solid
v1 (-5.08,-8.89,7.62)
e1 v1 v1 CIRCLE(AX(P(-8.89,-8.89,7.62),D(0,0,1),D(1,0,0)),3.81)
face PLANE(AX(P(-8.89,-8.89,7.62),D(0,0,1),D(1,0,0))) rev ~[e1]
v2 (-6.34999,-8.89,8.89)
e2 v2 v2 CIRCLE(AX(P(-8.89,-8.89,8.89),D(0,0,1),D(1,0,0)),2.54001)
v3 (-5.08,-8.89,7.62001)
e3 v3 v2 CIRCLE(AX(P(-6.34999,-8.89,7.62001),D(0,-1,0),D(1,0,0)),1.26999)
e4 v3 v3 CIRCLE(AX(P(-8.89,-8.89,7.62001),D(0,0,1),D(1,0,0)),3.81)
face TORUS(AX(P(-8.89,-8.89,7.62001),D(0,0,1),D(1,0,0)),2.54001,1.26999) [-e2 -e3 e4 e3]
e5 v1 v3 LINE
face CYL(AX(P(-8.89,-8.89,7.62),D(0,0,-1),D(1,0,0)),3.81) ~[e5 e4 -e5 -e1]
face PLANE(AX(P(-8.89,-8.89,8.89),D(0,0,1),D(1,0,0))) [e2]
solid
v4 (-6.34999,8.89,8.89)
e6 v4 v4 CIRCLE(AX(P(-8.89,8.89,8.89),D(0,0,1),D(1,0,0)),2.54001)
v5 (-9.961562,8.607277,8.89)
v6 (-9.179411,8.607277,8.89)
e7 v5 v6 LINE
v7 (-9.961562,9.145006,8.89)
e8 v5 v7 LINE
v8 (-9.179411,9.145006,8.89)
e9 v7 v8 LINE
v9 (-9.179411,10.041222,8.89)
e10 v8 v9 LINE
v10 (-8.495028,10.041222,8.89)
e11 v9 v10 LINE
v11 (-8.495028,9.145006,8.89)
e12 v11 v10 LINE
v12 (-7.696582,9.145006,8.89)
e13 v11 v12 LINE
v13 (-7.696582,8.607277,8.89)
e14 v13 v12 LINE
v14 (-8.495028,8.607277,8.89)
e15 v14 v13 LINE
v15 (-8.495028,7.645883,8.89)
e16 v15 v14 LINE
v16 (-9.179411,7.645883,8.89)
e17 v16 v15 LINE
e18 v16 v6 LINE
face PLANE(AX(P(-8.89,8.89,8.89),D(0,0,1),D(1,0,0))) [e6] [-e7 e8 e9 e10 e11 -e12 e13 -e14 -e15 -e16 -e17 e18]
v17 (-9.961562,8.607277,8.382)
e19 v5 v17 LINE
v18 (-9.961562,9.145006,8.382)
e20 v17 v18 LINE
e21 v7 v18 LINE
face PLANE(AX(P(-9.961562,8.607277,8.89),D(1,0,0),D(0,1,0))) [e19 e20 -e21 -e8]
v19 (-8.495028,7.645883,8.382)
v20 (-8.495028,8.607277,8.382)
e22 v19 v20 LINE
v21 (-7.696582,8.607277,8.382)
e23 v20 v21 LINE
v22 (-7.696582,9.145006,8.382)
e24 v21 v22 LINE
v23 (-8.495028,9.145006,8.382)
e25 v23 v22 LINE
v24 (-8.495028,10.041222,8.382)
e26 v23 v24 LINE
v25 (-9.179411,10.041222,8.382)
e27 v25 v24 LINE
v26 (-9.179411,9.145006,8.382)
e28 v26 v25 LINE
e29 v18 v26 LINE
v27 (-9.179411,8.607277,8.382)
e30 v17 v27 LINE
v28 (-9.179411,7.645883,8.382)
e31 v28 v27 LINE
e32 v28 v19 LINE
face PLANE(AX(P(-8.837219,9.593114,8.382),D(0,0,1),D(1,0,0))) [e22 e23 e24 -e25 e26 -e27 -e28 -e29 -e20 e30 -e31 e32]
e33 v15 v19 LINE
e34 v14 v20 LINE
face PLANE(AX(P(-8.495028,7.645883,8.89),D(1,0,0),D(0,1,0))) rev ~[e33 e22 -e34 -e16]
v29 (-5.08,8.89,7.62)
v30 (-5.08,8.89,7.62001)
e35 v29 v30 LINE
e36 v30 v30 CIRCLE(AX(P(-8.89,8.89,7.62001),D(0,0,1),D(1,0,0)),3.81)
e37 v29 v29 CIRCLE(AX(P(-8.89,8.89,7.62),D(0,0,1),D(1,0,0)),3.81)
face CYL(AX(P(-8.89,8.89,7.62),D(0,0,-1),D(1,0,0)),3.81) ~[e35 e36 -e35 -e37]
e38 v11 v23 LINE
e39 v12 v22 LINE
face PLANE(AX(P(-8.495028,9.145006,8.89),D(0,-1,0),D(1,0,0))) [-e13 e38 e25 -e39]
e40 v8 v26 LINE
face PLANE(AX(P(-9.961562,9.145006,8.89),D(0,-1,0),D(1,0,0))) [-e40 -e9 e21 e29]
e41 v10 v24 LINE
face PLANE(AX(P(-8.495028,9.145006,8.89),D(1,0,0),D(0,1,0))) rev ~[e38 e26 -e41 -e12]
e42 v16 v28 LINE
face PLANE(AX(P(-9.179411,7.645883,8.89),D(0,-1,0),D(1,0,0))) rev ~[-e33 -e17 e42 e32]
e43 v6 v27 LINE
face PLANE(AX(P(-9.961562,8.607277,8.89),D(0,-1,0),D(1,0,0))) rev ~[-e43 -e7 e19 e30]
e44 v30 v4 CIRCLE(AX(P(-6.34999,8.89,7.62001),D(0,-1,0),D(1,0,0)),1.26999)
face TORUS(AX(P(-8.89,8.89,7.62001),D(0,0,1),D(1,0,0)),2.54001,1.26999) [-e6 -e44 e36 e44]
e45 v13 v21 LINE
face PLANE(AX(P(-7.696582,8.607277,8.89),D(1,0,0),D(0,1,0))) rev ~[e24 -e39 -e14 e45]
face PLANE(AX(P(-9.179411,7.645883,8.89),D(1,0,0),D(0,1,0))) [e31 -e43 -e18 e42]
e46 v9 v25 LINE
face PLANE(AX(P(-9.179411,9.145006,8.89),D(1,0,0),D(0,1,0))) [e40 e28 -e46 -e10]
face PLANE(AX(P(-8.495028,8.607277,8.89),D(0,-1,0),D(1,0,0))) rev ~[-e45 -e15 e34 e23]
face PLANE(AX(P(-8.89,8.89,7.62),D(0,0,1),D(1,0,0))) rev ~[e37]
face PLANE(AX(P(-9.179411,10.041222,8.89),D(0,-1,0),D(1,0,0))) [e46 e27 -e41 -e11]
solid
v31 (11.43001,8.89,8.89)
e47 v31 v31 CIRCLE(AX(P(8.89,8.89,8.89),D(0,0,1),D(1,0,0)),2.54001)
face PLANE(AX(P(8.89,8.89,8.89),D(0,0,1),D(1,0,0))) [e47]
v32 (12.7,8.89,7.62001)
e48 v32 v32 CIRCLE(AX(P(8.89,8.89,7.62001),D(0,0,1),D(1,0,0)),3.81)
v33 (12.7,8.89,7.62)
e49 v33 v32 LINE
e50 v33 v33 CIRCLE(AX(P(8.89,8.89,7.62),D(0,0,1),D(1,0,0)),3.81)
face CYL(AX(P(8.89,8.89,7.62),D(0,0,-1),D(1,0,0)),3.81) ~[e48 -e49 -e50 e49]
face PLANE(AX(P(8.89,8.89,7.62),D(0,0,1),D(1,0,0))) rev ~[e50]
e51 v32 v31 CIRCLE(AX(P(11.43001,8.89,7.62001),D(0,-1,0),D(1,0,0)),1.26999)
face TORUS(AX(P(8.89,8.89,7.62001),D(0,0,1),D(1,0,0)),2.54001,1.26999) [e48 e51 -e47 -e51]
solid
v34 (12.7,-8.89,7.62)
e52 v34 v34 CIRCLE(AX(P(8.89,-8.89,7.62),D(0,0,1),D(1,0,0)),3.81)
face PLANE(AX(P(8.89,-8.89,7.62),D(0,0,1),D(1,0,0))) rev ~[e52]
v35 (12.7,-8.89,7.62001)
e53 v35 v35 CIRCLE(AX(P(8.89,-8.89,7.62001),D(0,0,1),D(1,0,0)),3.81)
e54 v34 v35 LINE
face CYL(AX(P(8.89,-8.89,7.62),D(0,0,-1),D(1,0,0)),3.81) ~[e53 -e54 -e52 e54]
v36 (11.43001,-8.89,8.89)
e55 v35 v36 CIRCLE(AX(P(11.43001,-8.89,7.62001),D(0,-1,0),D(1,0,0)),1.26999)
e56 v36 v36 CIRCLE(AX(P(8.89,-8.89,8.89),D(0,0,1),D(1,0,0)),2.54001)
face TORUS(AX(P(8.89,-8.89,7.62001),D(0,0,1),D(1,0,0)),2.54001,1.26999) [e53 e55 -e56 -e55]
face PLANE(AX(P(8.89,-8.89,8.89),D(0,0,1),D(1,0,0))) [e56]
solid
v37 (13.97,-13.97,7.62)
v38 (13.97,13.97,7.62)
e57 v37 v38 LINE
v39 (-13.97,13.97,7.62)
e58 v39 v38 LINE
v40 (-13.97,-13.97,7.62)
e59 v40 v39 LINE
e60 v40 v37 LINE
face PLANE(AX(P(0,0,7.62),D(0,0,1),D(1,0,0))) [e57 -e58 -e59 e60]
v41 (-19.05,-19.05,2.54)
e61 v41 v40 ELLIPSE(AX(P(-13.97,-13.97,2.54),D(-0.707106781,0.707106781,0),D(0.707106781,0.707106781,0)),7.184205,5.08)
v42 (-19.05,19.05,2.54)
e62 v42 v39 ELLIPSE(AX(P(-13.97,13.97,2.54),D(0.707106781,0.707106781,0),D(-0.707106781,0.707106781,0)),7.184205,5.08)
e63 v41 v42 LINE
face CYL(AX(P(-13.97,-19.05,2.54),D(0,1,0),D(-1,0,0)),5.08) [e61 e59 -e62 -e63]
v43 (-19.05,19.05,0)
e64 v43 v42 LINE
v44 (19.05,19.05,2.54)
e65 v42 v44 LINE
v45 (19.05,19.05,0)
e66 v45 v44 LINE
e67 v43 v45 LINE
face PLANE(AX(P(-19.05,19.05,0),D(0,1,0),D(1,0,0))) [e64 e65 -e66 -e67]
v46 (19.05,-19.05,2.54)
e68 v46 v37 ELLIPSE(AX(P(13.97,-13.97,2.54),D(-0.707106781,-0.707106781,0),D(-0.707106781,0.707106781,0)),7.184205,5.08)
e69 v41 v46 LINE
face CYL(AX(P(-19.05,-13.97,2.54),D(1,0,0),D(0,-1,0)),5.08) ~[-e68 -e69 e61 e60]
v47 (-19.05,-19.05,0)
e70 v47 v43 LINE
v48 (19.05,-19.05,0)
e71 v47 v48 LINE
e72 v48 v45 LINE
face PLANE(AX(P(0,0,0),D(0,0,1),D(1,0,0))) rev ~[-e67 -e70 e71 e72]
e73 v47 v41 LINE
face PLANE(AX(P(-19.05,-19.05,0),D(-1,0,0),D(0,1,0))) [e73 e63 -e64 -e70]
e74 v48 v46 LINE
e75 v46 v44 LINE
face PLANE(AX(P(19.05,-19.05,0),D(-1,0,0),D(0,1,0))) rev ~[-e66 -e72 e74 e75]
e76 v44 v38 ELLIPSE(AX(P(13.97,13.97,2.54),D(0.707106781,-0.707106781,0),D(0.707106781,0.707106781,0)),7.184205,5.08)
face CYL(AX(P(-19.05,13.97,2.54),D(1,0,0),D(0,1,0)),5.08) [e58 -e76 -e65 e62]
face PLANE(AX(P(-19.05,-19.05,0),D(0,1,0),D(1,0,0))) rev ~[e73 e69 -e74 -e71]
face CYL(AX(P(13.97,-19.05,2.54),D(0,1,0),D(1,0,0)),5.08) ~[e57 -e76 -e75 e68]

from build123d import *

# Parameters (mm, degrees)
F0_W     = 38.1
F0_H     = 38.1
F1_DEPTH = 7.62
F2_R     = 5.08
F3_R     = 3.81
F4_DEPTH = 1.27
F5_R     = 1.26999
F5_2_R   = 1.26999
F5_3_R   = 1.26999
F5_4_R   = 1.26999
F6_W     = 0.684382394
F6_H     = 0.8962163702
F6_W_2   = 0.7821517065
F6_H_2   = 0.5377288908
F6_W_3   = 0.7984461263
F6_H_3   = 0.9613940492
F7_DEPTH = 0.508


# Not quite as in the source:
# - a fillet or chamfer is up to 0.001 mm smaller than in the source, because OpenCascade refuses the exact size
# - a feature of the source that left no trace in its solid (it failed there, or was rolled back) is left out


with BuildPart() as f1:
    # F0 (on Top) → F1 (new body)
    with BuildSketch(Plane.XY):
        Rectangle(F0_W, F0_H)
    extrude(amount=F1_DEPTH)

    # F2
    f2_edges = [f1.edges().sort_by_distance(p)[0] for p in [
        (-19.05, 0, 7.62),
        (0, 19.05, 7.62),
        (19.05, 0, 7.62),
        (0, -19.05, 7.62),
    ]]
    fillet(f2_edges, radius=F2_R)


with BuildPart() as f4:
    # F3 (on face) → F4 (new body)
    with BuildSketch(Plane.XY.offset(7.62)):
        with Locations((8.89, 8.89)):
            Circle(F3_R)
    extrude(amount=F4_DEPTH)

    # F5 (radius 1.27 in the source; OpenCascade refuses exactly that, so slightly less here)
    f5_edges = [f4.edges().sort_by_distance(p)[0] for p in [
        (5.08, 8.89, 8.89),
    ]]
    fillet(f5_edges, radius=F5_R)


with BuildPart() as f4b:
    # F3 (on face) → F4, piece 2 (new body)
    with BuildSketch(Plane.XY.offset(7.62)):
        with Locations((8.89, -8.89)):
            Circle(F3_R)
    extrude(amount=F4_DEPTH)

    # F5#2 (radius 1.27 in the source; OpenCascade refuses exactly that, so slightly less here)
    f5_2_edges = [f4b.edges().sort_by_distance(p)[0] for p in [
        (5.08, -8.89, 8.89),
    ]]
    fillet(f5_2_edges, radius=F5_2_R)


with BuildPart() as f4c:
    # F3 (on face) → F4, piece 3 (new body)
    with BuildSketch(Plane.XY.offset(7.62)):
        with Locations((-8.89, -8.89)):
            Circle(F3_R)
    extrude(amount=F4_DEPTH)

    # F5#3 (radius 1.27 in the source; OpenCascade refuses exactly that, so slightly less here)
    f5_3_edges = [f4c.edges().sort_by_distance(p)[0] for p in [
        (-12.7, -8.89, 8.89),
    ]]
    fillet(f5_3_edges, radius=F5_3_R)


with BuildPart() as f4d:
    # F3 (on face) → F4, piece 4 (new body)
    with BuildSketch(Plane.XY.offset(7.62)):
        with Locations((-8.89, 8.89)):
            Circle(F3_R)
    extrude(amount=F4_DEPTH)

    # F5#4 (radius 1.27 in the source; OpenCascade refuses exactly that, so slightly less here)
    f5_4_edges = [f4d.edges().sort_by_distance(p)[0] for p in [
        (-12.7, 8.89, 8.89),
    ]]
    fillet(f5_4_edges, radius=F5_4_R)

    # F6 (on face) → F7 (cut)
    with BuildSketch(Plane.XY.offset(8.89)):
        with Locations((-8.8372193277, 9.5931137912)):
            Rectangle(F6_W, F6_H)
        with Locations((-9.5704863779, 8.8761411607)):
            Rectangle(F6_W_2, F6_H_2)
        with Locations((-8.8372193277, 8.8761411607)):
            Rectangle(F6_W, F6_H_2)
        with Locations((-8.0958050676, 8.8761411607)):
            Rectangle(F6_W_3, F6_H_2)
        with Locations((-8.8372193277, 8.1265796907)):
            Rectangle(F6_W, F6_H_3)
        with Locations((8.8355047628, 8.2747801207)):
            Rectangle(F6_W, F6_H_3)
        with Locations((8.1022377126, 9.0243415907)):
            Rectangle(F6_W_2, F6_H_2)
        with Locations((8.8355047628, 9.0243415907)):
            Rectangle(F6_W, F6_H_2)
        with Locations((8.8355047628, 9.7413142212)):
            Rectangle(F6_W, F6_H)
        with Locations((9.5769190229, 9.0243415907)):
            Rectangle(F6_W_3, F6_H_2)
        with Locations((-9.6729216166, -8.7657244876)):
            Rectangle(F6_W_2, F6_H_2)
        with Locations((-8.9396545663, -8.7657244876)):
            Rectangle(F6_W, F6_H_2)
        with Locations((-8.9396545663, -8.0487518571)):
            Rectangle(F6_W, F6_H)
        with Locations((-8.1982403062, -8.7657244876)):
            Rectangle(F6_W_3, F6_H_2)
        with Locations((8.8686496019, -9.6509321593)):
            Rectangle(F6_W, F6_H_3)
        with Locations((8.1353825517, -8.9013706893)):
            Rectangle(F6_W_2, F6_H_2)
        with Locations((9.6100638621, -8.9013706893)):
            Rectangle(F6_W_3, F6_H_2)
        with Locations((8.8686496019, -8.1843980588)):
            Rectangle(F6_W, F6_H)
        with Locations((8.8686496019, -8.9013706893)):
            Rectangle(F6_W, F6_H_2)
        with Locations((-8.9396545663, -9.5152859576)):
            Rectangle(F6_W, F6_H_3)
    extrude(amount=-F7_DEPTH, mode=Mode.SUBTRACT)


solid = Compound([f1.part, f4.part, f4b.part, f4c.part, f4d.part])
